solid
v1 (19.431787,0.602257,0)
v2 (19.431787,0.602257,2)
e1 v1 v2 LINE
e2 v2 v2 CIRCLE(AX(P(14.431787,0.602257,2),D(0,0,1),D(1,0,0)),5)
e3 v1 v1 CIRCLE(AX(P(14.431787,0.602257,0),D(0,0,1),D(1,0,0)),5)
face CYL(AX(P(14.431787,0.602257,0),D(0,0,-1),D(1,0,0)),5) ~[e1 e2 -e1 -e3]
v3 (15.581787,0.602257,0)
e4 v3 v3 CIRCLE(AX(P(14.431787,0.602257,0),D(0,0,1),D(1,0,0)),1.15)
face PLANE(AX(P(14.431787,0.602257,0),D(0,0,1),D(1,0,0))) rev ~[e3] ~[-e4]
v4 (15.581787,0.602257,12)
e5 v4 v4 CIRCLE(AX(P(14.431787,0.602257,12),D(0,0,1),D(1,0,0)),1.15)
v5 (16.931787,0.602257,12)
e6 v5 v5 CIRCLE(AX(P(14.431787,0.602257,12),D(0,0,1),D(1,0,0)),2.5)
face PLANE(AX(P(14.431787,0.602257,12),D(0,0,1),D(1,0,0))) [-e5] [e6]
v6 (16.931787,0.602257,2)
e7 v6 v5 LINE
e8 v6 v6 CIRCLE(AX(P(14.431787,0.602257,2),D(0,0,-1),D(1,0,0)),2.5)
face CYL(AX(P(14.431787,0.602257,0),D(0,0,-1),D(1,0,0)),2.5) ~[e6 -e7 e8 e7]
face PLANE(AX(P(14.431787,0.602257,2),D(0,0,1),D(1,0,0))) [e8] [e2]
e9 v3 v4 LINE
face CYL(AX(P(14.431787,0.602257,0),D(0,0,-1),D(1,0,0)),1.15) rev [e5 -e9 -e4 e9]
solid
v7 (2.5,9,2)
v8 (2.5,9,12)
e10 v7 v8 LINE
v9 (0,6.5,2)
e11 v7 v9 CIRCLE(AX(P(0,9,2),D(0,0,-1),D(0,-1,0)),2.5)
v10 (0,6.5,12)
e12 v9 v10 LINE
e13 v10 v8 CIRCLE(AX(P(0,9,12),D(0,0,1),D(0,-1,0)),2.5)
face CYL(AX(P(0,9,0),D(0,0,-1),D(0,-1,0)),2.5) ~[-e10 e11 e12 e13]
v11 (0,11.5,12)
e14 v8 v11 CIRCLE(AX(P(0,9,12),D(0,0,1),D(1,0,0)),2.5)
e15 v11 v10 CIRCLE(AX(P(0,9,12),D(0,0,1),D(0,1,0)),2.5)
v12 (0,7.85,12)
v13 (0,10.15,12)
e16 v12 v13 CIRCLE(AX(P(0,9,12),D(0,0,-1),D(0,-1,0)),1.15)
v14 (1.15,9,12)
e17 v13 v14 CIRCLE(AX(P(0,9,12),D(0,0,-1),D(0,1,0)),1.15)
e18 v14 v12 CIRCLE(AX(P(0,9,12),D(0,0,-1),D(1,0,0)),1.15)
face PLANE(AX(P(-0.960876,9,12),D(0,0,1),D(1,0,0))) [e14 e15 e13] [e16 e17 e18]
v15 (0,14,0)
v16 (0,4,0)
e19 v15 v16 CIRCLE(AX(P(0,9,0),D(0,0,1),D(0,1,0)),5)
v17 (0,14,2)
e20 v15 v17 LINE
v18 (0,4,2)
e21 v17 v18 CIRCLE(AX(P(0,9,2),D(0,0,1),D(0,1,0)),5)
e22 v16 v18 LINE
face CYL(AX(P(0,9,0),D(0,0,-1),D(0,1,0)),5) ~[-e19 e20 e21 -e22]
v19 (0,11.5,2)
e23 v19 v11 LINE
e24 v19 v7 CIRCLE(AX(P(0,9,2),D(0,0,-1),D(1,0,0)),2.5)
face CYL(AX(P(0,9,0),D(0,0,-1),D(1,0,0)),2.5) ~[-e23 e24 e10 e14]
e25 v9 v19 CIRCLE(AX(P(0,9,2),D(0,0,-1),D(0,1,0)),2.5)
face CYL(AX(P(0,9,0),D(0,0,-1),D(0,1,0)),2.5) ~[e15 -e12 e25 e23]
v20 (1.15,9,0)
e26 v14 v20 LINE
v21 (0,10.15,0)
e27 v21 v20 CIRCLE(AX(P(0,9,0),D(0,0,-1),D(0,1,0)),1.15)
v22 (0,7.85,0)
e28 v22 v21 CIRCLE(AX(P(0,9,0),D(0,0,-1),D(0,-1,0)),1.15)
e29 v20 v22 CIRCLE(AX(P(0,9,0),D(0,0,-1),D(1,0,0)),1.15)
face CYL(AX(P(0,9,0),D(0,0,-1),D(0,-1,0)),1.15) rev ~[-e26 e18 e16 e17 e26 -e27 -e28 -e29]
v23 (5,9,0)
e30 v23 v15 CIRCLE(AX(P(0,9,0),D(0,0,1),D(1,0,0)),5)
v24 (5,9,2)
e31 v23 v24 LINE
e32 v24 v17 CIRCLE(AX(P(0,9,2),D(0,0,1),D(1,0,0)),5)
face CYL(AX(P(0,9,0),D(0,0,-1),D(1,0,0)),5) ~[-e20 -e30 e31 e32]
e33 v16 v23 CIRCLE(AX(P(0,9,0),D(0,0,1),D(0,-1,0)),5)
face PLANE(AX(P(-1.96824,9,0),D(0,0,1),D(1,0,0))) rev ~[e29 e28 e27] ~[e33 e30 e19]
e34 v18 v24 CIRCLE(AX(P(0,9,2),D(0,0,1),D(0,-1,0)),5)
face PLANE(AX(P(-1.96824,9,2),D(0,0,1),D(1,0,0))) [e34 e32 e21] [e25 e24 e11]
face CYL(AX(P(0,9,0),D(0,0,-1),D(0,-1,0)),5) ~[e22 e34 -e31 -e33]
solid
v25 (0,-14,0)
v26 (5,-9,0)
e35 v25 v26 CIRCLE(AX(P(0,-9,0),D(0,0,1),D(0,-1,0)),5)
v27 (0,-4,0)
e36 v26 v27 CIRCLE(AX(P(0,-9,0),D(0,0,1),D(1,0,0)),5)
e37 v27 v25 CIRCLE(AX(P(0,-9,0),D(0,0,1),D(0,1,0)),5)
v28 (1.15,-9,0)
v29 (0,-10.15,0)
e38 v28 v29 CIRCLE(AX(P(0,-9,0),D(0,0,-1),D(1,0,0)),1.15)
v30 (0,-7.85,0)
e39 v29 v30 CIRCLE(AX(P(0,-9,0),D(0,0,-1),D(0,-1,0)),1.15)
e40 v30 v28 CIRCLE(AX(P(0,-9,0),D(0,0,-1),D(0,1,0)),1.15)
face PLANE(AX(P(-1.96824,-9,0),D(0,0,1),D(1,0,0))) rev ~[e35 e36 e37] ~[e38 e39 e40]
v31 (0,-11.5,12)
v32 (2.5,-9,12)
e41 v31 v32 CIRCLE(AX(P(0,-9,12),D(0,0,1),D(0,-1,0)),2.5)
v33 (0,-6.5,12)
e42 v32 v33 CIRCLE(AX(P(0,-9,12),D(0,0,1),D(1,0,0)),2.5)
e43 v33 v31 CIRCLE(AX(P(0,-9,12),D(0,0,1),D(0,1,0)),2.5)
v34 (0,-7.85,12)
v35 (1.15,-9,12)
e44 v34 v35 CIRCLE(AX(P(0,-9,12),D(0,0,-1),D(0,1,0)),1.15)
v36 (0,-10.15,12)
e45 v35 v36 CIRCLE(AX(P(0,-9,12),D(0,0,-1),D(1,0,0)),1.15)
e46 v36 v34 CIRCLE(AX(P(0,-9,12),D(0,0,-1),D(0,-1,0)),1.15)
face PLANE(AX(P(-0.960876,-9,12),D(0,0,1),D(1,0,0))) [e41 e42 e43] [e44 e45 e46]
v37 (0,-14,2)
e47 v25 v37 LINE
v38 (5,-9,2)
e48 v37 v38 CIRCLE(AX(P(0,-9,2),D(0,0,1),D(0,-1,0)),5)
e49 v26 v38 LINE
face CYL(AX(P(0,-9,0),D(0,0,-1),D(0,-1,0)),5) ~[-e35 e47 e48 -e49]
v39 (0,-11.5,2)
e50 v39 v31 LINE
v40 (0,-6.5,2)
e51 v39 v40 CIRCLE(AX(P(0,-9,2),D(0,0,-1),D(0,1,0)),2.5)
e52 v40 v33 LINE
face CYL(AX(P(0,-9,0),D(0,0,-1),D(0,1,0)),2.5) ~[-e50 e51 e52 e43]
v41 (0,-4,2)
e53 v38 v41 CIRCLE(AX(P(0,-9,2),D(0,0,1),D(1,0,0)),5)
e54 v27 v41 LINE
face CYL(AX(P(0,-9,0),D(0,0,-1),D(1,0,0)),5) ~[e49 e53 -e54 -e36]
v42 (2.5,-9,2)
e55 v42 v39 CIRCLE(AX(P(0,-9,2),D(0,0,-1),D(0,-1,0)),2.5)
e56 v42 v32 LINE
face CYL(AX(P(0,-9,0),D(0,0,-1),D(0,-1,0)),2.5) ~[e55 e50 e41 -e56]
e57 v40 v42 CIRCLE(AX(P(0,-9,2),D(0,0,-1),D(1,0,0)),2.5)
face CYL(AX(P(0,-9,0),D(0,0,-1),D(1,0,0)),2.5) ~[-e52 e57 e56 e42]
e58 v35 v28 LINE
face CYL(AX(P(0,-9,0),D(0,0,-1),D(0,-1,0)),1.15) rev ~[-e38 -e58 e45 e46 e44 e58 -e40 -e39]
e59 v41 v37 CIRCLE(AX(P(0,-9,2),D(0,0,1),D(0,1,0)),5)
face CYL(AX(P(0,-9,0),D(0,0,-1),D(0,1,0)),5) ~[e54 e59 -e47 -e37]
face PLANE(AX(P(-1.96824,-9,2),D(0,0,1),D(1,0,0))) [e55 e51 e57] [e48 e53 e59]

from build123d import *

# Parameters (mm, degrees)
F1_DEPTH = 2
F0_R     = 5
F0_R_2   = 2.5
F0_R_3   = 1.15
F2_DEPTH = 12


with BuildPart() as f1:
    # F0 (on Top) → F1 (new body)
    with BuildSketch(Plane.XY):
        with BuildLine():
            ThreePointArc((0, -4), (-5, -9), (0, -14))
            Line((0, -14), (0, -11.5))
            ThreePointArc((0, -11.5), (-2.5, -9), (0, -6.5))
            Line((0, -6.5), (0, -4))
        make_face()
        with BuildLine():
            Line((0, -11.5), (0, -14))
            ThreePointArc((0, -14), (3.5355339059, -12.5355339059), (5, -9))
            ThreePointArc((5, -9), (3.5355339059, -5.4644660941), (0, -4))
            Line((0, -4), (0, -6.5))
            ThreePointArc((0, -6.5), (1.767766953, -7.232233047), (2.5, -9))
            ThreePointArc((2.5, -9), (1.767766953, -10.767766953), (0, -11.5))
        make_face()
        with BuildLine():
            ThreePointArc((0, -6.5), (-2.5, -9), (0, -11.5))
            Line((0, -11.5), (0, -10.15))
            ThreePointArc((0, -10.15), (-1.15, -9), (0, -7.85))
            Line((0, -7.85), (0, -6.5))
        make_face()
        with BuildLine():
            Line((0, -10.15), (0, -11.5))
            ThreePointArc((0, -11.5), (1.767766953, -10.767766953), (2.5, -9))
            ThreePointArc((2.5, -9), (1.767766953, -7.232233047), (0, -6.5))
            Line((0, -6.5), (0, -7.85))
            ThreePointArc((0, -7.85), (0.8131727984, -8.1868272016), (1.15, -9))
            ThreePointArc((1.15, -9), (0.8131727984, -9.8131727984), (0, -10.15))
        make_face()
    extrude(amount=F1_DEPTH)

    # F0 (on Top) → F2 (join)
    with BuildSketch(Plane.XY):
        with BuildLine():
            ThreePointArc((0, -6.5), (-2.5, -9), (0, -11.5))
            Line((0, -11.5), (0, -10.15))
            ThreePointArc((0, -10.15), (-1.15, -9), (0, -7.85))
            Line((0, -7.85), (0, -6.5))
        make_face()
        with BuildLine():
            Line((0, -10.15), (0, -11.5))
            ThreePointArc((0, -11.5), (1.767766953, -10.767766953), (2.5, -9))
            ThreePointArc((2.5, -9), (1.767766953, -7.232233047), (0, -6.5))
            Line((0, -6.5), (0, -7.85))
            ThreePointArc((0, -7.85), (0.8131727984, -8.1868272016), (1.15, -9))
            ThreePointArc((1.15, -9), (0.8131727984, -9.8131727984), (0, -10.15))
        make_face()
    extrude(amount=F2_DEPTH)


with BuildPart() as f1b:
    # F0 (on Top) → F1, piece 2 (new body)
    with BuildSketch(Plane.XY):
        with BuildLine():
            ThreePointArc((0, 14), (-5, 9), (0, 4))
            Line((0, 4), (0, 6.5))
            ThreePointArc((0, 6.5), (-2.5, 9), (0, 11.5))
            Line((0, 11.5), (0, 14))
        make_face()
        with BuildLine():
            Line((0, 6.5), (0, 4))
            ThreePointArc((0, 4), (3.5355339059, 5.4644660941), (5, 9))
            ThreePointArc((5, 9), (3.5355339059, 12.5355339059), (0, 14))
            Line((0, 14), (0, 11.5))
            ThreePointArc((0, 11.5), (1.767766953, 10.767766953), (2.5, 9))
            ThreePointArc((2.5, 9), (1.767766953, 7.232233047), (0, 6.5))
        make_face()
        with BuildLine():
            ThreePointArc((0, 11.5), (-2.5, 9), (0, 6.5))
            Line((0, 6.5), (0, 7.85))
            ThreePointArc((0, 7.85), (-1.15, 9), (0, 10.15))
            Line((0, 10.15), (0, 11.5))
        make_face()
        with BuildLine():
            Line((0, 7.85), (0, 6.5))
            ThreePointArc((0, 6.5), (1.767766953, 7.232233047), (2.5, 9))
            ThreePointArc((2.5, 9), (1.767766953, 10.767766953), (0, 11.5))
            Line((0, 11.5), (0, 10.15))
            ThreePointArc((0, 10.15), (0.8131727984, 9.8131727984), (1.15, 9))
            ThreePointArc((1.15, 9), (0.8131727984, 8.1868272016), (0, 7.85))
        make_face()
    extrude(amount=F1_DEPTH)

    # F0 (on Top) → F2, piece 2 (join)
    with BuildSketch(Plane.XY):
        with BuildLine():
            ThreePointArc((0, 11.5), (-2.5, 9), (0, 6.5))
            Line((0, 6.5), (0, 7.85))
            ThreePointArc((0, 7.85), (-1.15, 9), (0, 10.15))
            Line((0, 10.15), (0, 11.5))
        make_face()
        with BuildLine():
            Line((0, 7.85), (0, 6.5))
            ThreePointArc((0, 6.5), (1.767766953, 7.232233047), (2.5, 9))
            ThreePointArc((2.5, 9), (1.767766953, 10.767766953), (0, 11.5))
            Line((0, 11.5), (0, 10.15))
            ThreePointArc((0, 10.15), (0.8131727984, 9.8131727984), (1.15, 9))
            ThreePointArc((1.15, 9), (0.8131727984, 8.1868272016), (0, 7.85))
        make_face()
    extrude(amount=F2_DEPTH)


with BuildPart() as f1c:
    # F0 (on Top) → F1, piece 3 (new body)
    with BuildSketch(Plane.XY):
        with Locations((14.4317867234, 0.602257438)):
            Circle(F0_R)
        with Locations((14.4317867234, 0.602257438)):
            Circle(F0_R_2, mode=Mode.SUBTRACT)
        with Locations((14.4317867234, 0.602257438)):
            Circle(F0_R_2)
        with Locations((14.4317867234, 0.602257438)):
            Circle(F0_R_3, mode=Mode.SUBTRACT)
    extrude(amount=F1_DEPTH)

    # F0 (on Top) → F2, piece 3 (join)
    with BuildSketch(Plane.XY):
        with Locations((14.4317867234, 0.602257438)):
            Circle(F0_R_2)
        with Locations((14.4317867234, 0.602257438)):
            Circle(F0_R_3, mode=Mode.SUBTRACT)
    extrude(amount=F2_DEPTH)


solid = Compound([f1.part, f1b.part, f1c.part])
